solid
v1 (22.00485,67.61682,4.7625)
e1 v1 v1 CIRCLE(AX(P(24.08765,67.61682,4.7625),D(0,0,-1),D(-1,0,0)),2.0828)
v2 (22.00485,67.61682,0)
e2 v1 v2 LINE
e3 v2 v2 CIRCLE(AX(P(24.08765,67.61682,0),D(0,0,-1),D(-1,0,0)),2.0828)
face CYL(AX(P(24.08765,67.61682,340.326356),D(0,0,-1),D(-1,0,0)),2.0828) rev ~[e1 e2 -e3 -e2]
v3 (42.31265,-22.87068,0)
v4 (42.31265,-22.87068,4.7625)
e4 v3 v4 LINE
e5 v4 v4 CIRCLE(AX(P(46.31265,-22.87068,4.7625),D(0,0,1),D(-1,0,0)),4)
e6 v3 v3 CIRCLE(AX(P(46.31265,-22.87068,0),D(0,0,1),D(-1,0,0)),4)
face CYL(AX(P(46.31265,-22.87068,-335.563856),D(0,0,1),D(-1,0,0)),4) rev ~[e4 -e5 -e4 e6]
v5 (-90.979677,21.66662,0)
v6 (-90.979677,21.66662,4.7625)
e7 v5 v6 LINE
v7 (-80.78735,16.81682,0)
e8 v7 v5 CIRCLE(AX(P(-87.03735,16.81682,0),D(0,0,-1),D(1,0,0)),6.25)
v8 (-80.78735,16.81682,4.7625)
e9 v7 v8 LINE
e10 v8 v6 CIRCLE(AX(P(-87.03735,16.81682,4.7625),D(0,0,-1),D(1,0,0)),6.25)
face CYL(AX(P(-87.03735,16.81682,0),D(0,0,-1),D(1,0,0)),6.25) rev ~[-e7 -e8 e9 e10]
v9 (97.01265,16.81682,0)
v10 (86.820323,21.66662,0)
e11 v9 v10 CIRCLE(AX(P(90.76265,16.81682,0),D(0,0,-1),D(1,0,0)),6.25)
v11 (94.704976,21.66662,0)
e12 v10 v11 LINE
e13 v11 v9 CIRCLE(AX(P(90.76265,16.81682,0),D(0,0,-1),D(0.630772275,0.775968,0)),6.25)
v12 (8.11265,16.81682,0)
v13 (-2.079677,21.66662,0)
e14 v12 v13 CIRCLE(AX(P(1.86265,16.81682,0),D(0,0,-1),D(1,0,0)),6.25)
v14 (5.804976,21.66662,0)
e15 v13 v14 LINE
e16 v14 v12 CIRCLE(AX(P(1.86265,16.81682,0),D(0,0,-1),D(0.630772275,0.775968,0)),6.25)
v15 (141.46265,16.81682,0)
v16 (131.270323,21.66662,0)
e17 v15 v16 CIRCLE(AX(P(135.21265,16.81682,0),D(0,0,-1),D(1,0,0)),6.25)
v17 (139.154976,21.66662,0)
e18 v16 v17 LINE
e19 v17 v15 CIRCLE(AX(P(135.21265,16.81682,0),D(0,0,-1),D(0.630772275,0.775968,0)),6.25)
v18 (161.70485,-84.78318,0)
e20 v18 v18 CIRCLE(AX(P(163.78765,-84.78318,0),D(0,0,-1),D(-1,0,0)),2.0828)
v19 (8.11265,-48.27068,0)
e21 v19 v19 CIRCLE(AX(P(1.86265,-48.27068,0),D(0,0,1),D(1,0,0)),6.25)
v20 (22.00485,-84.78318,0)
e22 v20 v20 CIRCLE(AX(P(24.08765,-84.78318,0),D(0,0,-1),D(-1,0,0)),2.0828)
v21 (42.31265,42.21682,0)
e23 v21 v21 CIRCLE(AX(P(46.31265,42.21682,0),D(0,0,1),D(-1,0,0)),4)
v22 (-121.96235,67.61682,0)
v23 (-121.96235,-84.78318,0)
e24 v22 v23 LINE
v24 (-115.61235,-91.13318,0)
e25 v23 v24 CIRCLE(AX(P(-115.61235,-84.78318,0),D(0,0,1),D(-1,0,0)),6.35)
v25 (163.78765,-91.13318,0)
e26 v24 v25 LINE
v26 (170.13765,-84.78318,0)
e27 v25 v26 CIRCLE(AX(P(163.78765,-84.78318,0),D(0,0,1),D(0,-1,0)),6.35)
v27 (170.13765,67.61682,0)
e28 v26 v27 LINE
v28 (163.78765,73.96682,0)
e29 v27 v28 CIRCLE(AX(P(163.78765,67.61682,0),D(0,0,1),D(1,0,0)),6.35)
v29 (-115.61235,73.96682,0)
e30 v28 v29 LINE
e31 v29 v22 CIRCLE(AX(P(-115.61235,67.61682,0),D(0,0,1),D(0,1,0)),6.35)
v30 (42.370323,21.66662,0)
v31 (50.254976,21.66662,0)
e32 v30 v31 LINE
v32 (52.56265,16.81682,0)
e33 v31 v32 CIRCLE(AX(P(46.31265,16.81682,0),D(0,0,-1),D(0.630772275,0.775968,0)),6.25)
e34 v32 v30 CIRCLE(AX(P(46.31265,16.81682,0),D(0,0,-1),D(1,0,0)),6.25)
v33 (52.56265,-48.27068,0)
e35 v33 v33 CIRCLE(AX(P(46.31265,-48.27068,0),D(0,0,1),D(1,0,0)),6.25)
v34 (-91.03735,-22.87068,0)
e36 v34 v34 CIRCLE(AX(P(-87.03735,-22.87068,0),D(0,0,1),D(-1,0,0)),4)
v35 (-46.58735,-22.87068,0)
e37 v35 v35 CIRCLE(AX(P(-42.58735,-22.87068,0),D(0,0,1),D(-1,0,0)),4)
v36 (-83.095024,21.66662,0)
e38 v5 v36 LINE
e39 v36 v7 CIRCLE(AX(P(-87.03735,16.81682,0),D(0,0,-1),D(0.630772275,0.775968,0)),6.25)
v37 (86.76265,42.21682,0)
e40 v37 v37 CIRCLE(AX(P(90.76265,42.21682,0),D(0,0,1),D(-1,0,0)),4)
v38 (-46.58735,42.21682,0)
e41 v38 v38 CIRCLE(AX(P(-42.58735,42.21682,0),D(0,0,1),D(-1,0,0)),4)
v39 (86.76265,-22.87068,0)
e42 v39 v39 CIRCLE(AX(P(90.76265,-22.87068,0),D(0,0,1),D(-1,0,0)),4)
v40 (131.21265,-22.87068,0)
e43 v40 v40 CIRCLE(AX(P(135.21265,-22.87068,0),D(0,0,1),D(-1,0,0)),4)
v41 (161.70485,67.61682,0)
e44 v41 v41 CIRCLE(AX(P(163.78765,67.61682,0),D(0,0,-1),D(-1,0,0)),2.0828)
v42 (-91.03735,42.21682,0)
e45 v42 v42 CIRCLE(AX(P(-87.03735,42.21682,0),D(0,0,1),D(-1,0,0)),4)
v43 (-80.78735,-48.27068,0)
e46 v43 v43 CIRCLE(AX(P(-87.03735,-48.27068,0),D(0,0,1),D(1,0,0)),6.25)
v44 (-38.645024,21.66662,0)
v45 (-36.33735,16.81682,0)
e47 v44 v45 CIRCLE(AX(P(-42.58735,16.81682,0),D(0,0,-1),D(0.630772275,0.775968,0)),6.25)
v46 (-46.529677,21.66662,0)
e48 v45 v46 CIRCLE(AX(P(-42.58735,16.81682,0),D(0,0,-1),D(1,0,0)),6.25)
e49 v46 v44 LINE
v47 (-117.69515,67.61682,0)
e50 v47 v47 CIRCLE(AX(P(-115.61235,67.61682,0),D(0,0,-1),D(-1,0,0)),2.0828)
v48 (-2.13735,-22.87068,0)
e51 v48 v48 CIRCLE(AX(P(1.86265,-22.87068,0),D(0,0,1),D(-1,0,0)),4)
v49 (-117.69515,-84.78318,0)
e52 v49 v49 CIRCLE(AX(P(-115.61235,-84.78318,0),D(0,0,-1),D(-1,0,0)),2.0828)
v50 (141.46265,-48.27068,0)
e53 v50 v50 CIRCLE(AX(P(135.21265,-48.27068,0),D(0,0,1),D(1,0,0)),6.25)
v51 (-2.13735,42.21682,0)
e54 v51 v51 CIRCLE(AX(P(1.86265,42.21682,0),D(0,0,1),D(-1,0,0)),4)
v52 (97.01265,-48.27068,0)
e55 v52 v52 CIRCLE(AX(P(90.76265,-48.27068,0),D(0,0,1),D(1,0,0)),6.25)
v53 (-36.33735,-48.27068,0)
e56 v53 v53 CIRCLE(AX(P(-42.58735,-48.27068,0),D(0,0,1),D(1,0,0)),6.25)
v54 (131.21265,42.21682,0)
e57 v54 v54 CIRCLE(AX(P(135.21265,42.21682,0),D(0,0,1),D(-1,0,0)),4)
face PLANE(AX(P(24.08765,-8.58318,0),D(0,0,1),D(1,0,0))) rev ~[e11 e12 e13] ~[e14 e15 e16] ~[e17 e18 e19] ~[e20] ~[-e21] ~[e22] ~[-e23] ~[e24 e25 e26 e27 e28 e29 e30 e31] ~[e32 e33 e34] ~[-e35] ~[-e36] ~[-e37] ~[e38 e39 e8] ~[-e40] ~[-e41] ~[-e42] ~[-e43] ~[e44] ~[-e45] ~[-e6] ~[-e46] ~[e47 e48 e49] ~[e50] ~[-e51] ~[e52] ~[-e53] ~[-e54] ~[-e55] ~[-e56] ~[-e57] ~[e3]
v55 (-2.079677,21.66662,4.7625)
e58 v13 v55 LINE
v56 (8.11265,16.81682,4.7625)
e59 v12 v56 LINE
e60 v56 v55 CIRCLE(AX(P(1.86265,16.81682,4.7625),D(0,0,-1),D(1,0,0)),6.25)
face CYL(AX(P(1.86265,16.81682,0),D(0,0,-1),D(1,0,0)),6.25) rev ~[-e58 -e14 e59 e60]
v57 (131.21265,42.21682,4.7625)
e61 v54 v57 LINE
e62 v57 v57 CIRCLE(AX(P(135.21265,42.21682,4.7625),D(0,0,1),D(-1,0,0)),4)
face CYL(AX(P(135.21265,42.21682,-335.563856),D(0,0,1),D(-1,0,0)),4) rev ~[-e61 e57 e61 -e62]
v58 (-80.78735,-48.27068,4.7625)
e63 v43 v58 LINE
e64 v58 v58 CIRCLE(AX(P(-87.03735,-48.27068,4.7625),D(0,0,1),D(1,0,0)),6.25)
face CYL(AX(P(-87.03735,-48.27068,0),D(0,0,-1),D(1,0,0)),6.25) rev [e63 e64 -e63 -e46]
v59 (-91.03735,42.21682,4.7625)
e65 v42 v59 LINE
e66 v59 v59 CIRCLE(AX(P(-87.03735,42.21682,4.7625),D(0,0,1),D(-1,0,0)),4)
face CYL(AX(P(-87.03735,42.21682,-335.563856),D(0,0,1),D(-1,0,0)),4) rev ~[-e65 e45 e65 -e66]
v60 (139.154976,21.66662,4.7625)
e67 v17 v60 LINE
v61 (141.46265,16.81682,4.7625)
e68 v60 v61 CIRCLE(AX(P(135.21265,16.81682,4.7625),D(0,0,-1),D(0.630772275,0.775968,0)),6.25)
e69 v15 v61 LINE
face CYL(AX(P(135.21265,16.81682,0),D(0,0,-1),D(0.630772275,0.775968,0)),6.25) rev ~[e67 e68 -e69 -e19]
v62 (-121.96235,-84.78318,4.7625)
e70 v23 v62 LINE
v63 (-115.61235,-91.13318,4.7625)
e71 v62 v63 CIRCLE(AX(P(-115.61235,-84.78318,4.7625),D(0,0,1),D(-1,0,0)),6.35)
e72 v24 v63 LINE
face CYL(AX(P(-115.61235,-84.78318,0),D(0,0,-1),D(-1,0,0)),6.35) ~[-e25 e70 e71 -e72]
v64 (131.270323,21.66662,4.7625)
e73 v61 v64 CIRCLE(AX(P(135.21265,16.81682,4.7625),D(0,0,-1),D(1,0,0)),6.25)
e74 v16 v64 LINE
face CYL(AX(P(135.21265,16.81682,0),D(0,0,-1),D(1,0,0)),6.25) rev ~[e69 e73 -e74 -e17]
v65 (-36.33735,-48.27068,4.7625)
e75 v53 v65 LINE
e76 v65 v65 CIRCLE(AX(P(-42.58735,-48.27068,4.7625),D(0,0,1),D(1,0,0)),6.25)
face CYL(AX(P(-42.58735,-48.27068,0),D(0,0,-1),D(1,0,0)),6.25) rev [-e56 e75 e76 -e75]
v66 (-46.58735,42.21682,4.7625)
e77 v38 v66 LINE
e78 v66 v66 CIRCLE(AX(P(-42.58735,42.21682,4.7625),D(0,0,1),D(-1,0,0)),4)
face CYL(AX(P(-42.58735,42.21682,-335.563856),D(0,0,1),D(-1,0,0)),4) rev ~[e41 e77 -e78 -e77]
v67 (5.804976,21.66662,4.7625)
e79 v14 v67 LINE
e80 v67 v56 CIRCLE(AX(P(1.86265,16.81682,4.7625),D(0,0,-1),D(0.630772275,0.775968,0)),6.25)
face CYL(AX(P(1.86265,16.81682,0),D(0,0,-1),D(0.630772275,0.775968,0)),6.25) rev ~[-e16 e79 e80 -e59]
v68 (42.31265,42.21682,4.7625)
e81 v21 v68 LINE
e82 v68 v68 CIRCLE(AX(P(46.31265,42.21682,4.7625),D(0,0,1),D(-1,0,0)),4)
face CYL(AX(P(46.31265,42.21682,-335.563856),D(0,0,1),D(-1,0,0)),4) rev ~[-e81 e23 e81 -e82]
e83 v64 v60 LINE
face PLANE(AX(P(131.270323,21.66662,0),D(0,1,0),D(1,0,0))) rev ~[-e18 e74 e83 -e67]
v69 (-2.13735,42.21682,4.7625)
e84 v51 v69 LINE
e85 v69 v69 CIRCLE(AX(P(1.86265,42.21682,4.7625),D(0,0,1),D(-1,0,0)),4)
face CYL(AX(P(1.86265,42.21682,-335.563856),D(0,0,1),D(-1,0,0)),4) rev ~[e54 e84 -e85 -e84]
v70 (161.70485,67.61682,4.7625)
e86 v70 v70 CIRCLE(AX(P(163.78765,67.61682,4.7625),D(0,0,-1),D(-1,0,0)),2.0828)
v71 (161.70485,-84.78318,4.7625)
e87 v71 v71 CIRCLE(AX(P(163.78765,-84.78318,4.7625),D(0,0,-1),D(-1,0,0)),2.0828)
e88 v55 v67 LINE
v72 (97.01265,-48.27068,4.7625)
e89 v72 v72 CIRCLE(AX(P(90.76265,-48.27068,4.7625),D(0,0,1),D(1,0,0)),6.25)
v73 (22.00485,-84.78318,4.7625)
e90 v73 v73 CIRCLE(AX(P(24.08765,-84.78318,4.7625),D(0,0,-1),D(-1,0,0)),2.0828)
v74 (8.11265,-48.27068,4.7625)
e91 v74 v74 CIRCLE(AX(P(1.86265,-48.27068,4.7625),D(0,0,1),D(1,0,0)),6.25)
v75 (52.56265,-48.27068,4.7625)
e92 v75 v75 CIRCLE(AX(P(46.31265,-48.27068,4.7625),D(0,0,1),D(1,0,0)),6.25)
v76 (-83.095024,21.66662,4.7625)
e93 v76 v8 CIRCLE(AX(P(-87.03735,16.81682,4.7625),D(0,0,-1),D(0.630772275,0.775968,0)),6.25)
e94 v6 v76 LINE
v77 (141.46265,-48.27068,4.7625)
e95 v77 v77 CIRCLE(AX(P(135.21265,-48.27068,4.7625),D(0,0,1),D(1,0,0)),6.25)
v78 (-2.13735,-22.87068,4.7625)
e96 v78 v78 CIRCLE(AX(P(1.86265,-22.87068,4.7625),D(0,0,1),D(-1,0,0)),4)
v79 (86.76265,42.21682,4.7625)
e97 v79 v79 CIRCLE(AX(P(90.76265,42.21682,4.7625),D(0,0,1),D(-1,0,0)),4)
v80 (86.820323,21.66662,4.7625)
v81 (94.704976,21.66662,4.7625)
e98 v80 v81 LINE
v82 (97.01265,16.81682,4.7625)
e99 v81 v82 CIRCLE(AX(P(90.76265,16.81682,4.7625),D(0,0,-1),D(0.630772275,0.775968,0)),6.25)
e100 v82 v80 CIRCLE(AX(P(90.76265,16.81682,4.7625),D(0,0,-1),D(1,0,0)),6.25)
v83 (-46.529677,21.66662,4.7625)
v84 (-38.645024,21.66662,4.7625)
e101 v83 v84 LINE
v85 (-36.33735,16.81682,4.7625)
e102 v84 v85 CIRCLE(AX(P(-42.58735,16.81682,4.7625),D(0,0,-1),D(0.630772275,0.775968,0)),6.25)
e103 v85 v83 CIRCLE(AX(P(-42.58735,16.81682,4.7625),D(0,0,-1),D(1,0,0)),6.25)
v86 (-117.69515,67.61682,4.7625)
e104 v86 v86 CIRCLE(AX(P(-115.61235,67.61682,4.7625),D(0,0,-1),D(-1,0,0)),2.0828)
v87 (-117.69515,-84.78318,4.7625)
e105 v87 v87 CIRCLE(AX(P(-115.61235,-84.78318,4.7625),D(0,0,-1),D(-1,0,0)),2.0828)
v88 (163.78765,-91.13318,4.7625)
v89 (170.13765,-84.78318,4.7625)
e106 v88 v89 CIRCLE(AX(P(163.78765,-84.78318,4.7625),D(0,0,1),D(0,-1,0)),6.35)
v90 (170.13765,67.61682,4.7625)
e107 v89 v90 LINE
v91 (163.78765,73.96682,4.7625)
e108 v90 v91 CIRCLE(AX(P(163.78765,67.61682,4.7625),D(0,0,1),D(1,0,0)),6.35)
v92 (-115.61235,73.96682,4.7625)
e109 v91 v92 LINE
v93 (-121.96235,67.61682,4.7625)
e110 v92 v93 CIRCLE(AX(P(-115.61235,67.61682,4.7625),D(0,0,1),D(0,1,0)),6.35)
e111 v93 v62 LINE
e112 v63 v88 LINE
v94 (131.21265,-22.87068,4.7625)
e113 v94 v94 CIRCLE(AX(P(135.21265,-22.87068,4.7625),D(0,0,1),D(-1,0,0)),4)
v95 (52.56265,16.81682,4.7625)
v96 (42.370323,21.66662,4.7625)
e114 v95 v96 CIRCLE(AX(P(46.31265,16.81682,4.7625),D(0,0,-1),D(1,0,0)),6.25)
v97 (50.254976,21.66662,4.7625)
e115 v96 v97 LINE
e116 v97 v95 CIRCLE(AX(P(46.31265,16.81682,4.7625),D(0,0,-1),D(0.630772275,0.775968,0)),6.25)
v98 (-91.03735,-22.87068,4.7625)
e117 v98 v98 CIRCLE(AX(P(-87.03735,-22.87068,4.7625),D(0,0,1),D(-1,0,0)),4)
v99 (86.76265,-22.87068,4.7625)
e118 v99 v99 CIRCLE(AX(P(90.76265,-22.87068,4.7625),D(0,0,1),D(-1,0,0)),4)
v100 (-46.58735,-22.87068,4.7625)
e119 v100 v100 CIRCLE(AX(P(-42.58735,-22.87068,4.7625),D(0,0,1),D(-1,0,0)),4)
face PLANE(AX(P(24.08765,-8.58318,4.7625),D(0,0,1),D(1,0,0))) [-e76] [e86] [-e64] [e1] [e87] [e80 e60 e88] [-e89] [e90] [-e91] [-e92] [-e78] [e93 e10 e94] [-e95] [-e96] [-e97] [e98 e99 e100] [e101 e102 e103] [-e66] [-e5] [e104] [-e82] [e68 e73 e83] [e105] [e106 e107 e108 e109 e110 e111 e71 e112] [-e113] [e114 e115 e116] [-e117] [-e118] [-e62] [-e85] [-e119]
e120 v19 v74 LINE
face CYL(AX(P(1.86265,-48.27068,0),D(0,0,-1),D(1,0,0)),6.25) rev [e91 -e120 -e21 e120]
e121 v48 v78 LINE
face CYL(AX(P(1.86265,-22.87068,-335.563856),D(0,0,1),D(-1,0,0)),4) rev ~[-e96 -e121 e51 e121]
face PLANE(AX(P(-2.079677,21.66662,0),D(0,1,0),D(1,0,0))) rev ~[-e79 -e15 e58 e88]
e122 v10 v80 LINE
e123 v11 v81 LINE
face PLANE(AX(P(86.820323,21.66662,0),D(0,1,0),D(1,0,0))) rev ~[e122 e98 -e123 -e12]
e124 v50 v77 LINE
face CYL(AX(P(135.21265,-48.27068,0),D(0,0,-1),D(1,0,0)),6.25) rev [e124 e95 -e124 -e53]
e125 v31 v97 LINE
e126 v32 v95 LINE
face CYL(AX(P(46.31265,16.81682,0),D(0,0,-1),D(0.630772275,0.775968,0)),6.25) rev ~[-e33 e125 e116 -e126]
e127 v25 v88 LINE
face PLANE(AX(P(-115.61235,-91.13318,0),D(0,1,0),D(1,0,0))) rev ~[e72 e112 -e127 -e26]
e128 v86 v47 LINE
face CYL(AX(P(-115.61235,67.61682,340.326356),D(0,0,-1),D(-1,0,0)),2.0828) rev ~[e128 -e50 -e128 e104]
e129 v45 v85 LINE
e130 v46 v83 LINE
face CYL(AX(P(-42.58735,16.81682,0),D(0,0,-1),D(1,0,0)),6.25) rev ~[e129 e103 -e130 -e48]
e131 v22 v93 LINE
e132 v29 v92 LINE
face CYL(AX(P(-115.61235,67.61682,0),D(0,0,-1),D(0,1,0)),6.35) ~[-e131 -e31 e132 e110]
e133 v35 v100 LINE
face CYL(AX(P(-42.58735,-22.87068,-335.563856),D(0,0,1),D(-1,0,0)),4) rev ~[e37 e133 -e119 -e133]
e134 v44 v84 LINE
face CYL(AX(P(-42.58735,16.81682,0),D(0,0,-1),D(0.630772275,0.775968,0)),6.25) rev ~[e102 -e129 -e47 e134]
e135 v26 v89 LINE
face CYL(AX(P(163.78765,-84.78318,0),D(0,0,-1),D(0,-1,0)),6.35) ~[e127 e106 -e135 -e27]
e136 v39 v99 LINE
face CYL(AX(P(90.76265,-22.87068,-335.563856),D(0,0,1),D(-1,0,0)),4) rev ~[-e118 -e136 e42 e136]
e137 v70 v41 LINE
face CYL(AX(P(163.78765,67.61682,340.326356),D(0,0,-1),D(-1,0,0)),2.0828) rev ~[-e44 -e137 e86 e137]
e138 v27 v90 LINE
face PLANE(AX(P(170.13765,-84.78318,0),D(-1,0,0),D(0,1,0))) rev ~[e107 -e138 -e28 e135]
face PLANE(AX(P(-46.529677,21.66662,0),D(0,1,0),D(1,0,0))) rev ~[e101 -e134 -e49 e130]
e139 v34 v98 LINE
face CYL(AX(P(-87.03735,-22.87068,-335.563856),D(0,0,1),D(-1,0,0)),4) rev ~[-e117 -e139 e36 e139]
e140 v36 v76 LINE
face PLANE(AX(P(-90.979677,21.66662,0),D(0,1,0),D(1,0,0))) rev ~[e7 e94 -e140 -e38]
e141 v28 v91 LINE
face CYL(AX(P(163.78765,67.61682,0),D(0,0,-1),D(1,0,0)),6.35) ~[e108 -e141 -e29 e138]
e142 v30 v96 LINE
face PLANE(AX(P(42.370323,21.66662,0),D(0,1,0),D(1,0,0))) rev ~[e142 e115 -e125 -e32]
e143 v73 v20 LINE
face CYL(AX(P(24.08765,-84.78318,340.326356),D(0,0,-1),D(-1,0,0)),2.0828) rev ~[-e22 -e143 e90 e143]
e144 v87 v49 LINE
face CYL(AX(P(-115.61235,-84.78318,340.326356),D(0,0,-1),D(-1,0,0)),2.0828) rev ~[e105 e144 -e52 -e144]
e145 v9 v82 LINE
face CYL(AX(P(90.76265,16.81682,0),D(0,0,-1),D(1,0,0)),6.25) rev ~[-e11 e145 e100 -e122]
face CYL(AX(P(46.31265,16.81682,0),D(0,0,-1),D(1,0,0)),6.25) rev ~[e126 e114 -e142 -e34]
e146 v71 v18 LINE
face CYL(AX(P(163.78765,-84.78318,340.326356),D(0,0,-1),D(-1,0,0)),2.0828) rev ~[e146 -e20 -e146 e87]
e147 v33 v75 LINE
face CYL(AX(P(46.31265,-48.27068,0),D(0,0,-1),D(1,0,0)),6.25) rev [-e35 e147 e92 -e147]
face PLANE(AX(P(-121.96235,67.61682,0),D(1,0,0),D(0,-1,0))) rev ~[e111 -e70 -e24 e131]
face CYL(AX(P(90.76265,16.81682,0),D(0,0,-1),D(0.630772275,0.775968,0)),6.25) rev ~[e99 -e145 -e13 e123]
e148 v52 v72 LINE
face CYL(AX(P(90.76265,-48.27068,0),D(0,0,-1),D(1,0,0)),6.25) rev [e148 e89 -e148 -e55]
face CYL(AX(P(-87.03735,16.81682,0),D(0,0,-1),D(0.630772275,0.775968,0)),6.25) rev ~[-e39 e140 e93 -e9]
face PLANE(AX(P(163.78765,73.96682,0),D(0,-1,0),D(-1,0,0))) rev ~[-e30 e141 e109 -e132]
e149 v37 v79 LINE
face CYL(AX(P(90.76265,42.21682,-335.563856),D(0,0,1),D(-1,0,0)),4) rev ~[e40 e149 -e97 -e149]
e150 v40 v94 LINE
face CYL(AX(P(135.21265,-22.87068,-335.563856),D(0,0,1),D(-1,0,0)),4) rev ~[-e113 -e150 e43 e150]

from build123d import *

# Parameters (mm, degrees)
F0_R     = 6.25
F1_DEPTH = 4.7625
F2_D     = 8
F4_D     = 4.1656


# Not quite as in the source:
# - a feature names something its author has since deleted; it is built from what else it names


with BuildPart() as f1:
    # F0 (on Top) → F1 (new body)
    with BuildSketch(Plane.XY):
        with BuildLine():
            Line((163.7876496315, 73.9668203354), (-115.6123503685, 73.9668203354))
            ThreePointArc((-115.6123503685, 73.9668203354), (-120.102478429, 72.1069483959), (-121.9623503685, 67.6168203354))
            Line((-121.9623503685, 67.6168203354), (-121.9623503685, -84.7831796646))
            ThreePointArc((-121.9623503685, -84.7831796646), (-120.102478429, -89.2733077251), (-115.6123503685, -91.1331796646))
            Line((-115.6123503685, -91.1331796646), (163.7876496315, -91.1331796646))
            ThreePointArc((163.7876496315, -91.1331796646), (168.277777692, -89.2733077251), (170.1376496315, -84.7831796646))
            Line((170.1376496315, -84.7831796646), (170.1376496315, 67.6168203354))
            ThreePointArc((170.1376496315, 67.6168203354), (168.277777692, 72.1069483959), (163.7876496315, 73.9668203354))
        make_face()
        with Locations((-87.0373503685, -48.2706796646)):
            Circle(F0_R, mode=Mode.SUBTRACT)
        with Locations((-42.5873503685, -48.2706796646)):
            Circle(F0_R, mode=Mode.SUBTRACT)
        with Locations((1.8626496315, -48.2706796646)):
            Circle(F0_R, mode=Mode.SUBTRACT)
        with Locations((46.3126496315, -48.2706796646)):
            Circle(F0_R, mode=Mode.SUBTRACT)
        with Locations((90.7626496315, -48.2706796646)):
            Circle(F0_R, mode=Mode.SUBTRACT)
        with Locations((135.2126496315, -48.2706796646)):
            Circle(F0_R, mode=Mode.SUBTRACT)
        with BuildLine():
            ThreePointArc((-83.0950236494, 21.6666203354), (-81.3936794889, 19.5022400424), (-80.7873503685, 16.8168203354))
            ThreePointArc((-80.7873503685, 16.8168203354), (-89.7227700755, 11.1731494558), (-90.9796770876, 21.6666203354))
            ThreePointArc((-90.9796770876, 21.6666203354), (-87.0373503685, 23.0668203354), (-83.0950236494, 21.6666203354))
        make_face(mode=Mode.SUBTRACT)
        with BuildLine():
            ThreePointArc((-38.6450236494, 21.6666203354), (-36.9436794889, 19.5022400424), (-36.3373503685, 16.8168203354))
            ThreePointArc((-36.3373503685, 16.8168203354), (-45.2727700755, 11.1731494558), (-46.5296770876, 21.6666203354))
            ThreePointArc((-46.5296770876, 21.6666203354), (-42.5873503685, 23.0668203354), (-38.6450236494, 21.6666203354))
        make_face(mode=Mode.SUBTRACT)
        with BuildLine():
            ThreePointArc((5.8049763506, 21.6666203354), (7.5063205111, 19.5022400424), (8.1126496315, 16.8168203354))
            ThreePointArc((8.1126496315, 16.8168203354), (-0.8227700755, 11.1731494558), (-2.0796770876, 21.6666203354))
            ThreePointArc((-2.0796770876, 21.6666203354), (1.8626496315, 23.0668203354), (5.8049763506, 21.6666203354))
        make_face(mode=Mode.SUBTRACT)
        with BuildLine():
            ThreePointArc((50.2549763506, 21.6666203354), (51.9563205111, 19.5022400424), (52.5626496315, 16.8168203354))
            ThreePointArc((52.5626496315, 16.8168203354), (43.6272299245, 11.1731494558), (42.3703229124, 21.6666203354))
            ThreePointArc((42.3703229124, 21.6666203354), (46.3126496315, 23.0668203354), (50.2549763506, 21.6666203354))
        make_face(mode=Mode.SUBTRACT)
        with BuildLine():
            ThreePointArc((94.7049763506, 21.6666203354), (96.4063205111, 19.5022400424), (97.0126496315, 16.8168203354))
            ThreePointArc((97.0126496315, 16.8168203354), (88.0772299245, 11.1731494558), (86.8203229124, 21.6666203354))
            ThreePointArc((86.8203229124, 21.6666203354), (90.7626496315, 23.0668203354), (94.7049763506, 21.6666203354))
        make_face(mode=Mode.SUBTRACT)
        with BuildLine():
            ThreePointArc((139.1549763506, 21.6666203354), (140.8563205111, 19.5022400424), (141.4626496315, 16.8168203354))
            ThreePointArc((141.4626496315, 16.8168203354), (132.5272299245, 11.1731494558), (131.2703229124, 21.6666203354))
            ThreePointArc((131.2703229124, 21.6666203354), (135.2126496315, 23.0668203354), (139.1549763506, 21.6666203354))
        make_face(mode=Mode.SUBTRACT)
        with BuildLine():
            Line((-46.5296770876, 21.6666203354), (-38.6450236494, 21.6666203354))
            ThreePointArc((-38.6450236494, 21.6666203354), (-42.5873503685, 23.0668203354), (-46.5296770876, 21.6666203354))
        make_face()
        with BuildLine():
            Line((-90.9796770876, 21.6666203354), (-83.0950236494, 21.6666203354))
            ThreePointArc((-83.0950236494, 21.6666203354), (-87.0373503685, 23.0668203354), (-90.9796770876, 21.6666203354))
        make_face()
        with BuildLine():
            Line((131.2703229124, 21.6666203354), (139.1549763506, 21.6666203354))
            ThreePointArc((139.1549763506, 21.6666203354), (135.2126496315, 23.0668203354), (131.2703229124, 21.6666203354))
        make_face()
        with BuildLine():
            Line((42.3703229124, 21.6666203354), (50.2549763506, 21.6666203354))
            ThreePointArc((50.2549763506, 21.6666203354), (46.3126496315, 23.0668203354), (42.3703229124, 21.6666203354))
        make_face()
        with BuildLine():
            Line((-2.0796770876, 21.6666203354), (5.8049763506, 21.6666203354))
            ThreePointArc((5.8049763506, 21.6666203354), (1.8626496315, 23.0668203354), (-2.0796770876, 21.6666203354))
        make_face()
        with BuildLine():
            Line((86.8203229124, 21.6666203354), (94.7049763506, 21.6666203354))
            ThreePointArc((94.7049763506, 21.6666203354), (90.7626496315, 23.0668203354), (86.8203229124, 21.6666203354))
        make_face()
    extrude(amount=F1_DEPTH)

    # F2 (through all)
    with Locations(Plane(origin=(0, 0, 0), x_dir=(1, 0, 0), z_dir=(0, 0, -1))):
        with Locations((46.3126496315, -42.2168203354), (135.2126496315, -42.2168203354), (-87.0373503685, -42.2168203354), (-42.5873503685, -42.2168203354), (1.8626496315, -42.2168203354), (90.7626496315, -42.2168203354), (1.8626496315, 22.8706796646), (-87.0373503685, 22.8706796646), (90.7626496315, 22.8706796646), (-42.5873503685, 22.8706796646), (135.2126496315, 22.8706796646), (46.3126496315, 22.8706796646)):
            Hole(F2_D / 2)

    # F4 (through all)
    with Locations(Plane.XY.offset(4.7625)):
        with Locations((-115.6123503685, 67.6168203354), (163.7876496315, 67.6168203354), (163.7876496315, -84.7831796646), (-115.6123503685, -84.7831796646), (24.0876496315, 67.6168203354), (24.0876496315, -84.7831796646)):
            Hole(F4_D / 2)


solid = f1.part
